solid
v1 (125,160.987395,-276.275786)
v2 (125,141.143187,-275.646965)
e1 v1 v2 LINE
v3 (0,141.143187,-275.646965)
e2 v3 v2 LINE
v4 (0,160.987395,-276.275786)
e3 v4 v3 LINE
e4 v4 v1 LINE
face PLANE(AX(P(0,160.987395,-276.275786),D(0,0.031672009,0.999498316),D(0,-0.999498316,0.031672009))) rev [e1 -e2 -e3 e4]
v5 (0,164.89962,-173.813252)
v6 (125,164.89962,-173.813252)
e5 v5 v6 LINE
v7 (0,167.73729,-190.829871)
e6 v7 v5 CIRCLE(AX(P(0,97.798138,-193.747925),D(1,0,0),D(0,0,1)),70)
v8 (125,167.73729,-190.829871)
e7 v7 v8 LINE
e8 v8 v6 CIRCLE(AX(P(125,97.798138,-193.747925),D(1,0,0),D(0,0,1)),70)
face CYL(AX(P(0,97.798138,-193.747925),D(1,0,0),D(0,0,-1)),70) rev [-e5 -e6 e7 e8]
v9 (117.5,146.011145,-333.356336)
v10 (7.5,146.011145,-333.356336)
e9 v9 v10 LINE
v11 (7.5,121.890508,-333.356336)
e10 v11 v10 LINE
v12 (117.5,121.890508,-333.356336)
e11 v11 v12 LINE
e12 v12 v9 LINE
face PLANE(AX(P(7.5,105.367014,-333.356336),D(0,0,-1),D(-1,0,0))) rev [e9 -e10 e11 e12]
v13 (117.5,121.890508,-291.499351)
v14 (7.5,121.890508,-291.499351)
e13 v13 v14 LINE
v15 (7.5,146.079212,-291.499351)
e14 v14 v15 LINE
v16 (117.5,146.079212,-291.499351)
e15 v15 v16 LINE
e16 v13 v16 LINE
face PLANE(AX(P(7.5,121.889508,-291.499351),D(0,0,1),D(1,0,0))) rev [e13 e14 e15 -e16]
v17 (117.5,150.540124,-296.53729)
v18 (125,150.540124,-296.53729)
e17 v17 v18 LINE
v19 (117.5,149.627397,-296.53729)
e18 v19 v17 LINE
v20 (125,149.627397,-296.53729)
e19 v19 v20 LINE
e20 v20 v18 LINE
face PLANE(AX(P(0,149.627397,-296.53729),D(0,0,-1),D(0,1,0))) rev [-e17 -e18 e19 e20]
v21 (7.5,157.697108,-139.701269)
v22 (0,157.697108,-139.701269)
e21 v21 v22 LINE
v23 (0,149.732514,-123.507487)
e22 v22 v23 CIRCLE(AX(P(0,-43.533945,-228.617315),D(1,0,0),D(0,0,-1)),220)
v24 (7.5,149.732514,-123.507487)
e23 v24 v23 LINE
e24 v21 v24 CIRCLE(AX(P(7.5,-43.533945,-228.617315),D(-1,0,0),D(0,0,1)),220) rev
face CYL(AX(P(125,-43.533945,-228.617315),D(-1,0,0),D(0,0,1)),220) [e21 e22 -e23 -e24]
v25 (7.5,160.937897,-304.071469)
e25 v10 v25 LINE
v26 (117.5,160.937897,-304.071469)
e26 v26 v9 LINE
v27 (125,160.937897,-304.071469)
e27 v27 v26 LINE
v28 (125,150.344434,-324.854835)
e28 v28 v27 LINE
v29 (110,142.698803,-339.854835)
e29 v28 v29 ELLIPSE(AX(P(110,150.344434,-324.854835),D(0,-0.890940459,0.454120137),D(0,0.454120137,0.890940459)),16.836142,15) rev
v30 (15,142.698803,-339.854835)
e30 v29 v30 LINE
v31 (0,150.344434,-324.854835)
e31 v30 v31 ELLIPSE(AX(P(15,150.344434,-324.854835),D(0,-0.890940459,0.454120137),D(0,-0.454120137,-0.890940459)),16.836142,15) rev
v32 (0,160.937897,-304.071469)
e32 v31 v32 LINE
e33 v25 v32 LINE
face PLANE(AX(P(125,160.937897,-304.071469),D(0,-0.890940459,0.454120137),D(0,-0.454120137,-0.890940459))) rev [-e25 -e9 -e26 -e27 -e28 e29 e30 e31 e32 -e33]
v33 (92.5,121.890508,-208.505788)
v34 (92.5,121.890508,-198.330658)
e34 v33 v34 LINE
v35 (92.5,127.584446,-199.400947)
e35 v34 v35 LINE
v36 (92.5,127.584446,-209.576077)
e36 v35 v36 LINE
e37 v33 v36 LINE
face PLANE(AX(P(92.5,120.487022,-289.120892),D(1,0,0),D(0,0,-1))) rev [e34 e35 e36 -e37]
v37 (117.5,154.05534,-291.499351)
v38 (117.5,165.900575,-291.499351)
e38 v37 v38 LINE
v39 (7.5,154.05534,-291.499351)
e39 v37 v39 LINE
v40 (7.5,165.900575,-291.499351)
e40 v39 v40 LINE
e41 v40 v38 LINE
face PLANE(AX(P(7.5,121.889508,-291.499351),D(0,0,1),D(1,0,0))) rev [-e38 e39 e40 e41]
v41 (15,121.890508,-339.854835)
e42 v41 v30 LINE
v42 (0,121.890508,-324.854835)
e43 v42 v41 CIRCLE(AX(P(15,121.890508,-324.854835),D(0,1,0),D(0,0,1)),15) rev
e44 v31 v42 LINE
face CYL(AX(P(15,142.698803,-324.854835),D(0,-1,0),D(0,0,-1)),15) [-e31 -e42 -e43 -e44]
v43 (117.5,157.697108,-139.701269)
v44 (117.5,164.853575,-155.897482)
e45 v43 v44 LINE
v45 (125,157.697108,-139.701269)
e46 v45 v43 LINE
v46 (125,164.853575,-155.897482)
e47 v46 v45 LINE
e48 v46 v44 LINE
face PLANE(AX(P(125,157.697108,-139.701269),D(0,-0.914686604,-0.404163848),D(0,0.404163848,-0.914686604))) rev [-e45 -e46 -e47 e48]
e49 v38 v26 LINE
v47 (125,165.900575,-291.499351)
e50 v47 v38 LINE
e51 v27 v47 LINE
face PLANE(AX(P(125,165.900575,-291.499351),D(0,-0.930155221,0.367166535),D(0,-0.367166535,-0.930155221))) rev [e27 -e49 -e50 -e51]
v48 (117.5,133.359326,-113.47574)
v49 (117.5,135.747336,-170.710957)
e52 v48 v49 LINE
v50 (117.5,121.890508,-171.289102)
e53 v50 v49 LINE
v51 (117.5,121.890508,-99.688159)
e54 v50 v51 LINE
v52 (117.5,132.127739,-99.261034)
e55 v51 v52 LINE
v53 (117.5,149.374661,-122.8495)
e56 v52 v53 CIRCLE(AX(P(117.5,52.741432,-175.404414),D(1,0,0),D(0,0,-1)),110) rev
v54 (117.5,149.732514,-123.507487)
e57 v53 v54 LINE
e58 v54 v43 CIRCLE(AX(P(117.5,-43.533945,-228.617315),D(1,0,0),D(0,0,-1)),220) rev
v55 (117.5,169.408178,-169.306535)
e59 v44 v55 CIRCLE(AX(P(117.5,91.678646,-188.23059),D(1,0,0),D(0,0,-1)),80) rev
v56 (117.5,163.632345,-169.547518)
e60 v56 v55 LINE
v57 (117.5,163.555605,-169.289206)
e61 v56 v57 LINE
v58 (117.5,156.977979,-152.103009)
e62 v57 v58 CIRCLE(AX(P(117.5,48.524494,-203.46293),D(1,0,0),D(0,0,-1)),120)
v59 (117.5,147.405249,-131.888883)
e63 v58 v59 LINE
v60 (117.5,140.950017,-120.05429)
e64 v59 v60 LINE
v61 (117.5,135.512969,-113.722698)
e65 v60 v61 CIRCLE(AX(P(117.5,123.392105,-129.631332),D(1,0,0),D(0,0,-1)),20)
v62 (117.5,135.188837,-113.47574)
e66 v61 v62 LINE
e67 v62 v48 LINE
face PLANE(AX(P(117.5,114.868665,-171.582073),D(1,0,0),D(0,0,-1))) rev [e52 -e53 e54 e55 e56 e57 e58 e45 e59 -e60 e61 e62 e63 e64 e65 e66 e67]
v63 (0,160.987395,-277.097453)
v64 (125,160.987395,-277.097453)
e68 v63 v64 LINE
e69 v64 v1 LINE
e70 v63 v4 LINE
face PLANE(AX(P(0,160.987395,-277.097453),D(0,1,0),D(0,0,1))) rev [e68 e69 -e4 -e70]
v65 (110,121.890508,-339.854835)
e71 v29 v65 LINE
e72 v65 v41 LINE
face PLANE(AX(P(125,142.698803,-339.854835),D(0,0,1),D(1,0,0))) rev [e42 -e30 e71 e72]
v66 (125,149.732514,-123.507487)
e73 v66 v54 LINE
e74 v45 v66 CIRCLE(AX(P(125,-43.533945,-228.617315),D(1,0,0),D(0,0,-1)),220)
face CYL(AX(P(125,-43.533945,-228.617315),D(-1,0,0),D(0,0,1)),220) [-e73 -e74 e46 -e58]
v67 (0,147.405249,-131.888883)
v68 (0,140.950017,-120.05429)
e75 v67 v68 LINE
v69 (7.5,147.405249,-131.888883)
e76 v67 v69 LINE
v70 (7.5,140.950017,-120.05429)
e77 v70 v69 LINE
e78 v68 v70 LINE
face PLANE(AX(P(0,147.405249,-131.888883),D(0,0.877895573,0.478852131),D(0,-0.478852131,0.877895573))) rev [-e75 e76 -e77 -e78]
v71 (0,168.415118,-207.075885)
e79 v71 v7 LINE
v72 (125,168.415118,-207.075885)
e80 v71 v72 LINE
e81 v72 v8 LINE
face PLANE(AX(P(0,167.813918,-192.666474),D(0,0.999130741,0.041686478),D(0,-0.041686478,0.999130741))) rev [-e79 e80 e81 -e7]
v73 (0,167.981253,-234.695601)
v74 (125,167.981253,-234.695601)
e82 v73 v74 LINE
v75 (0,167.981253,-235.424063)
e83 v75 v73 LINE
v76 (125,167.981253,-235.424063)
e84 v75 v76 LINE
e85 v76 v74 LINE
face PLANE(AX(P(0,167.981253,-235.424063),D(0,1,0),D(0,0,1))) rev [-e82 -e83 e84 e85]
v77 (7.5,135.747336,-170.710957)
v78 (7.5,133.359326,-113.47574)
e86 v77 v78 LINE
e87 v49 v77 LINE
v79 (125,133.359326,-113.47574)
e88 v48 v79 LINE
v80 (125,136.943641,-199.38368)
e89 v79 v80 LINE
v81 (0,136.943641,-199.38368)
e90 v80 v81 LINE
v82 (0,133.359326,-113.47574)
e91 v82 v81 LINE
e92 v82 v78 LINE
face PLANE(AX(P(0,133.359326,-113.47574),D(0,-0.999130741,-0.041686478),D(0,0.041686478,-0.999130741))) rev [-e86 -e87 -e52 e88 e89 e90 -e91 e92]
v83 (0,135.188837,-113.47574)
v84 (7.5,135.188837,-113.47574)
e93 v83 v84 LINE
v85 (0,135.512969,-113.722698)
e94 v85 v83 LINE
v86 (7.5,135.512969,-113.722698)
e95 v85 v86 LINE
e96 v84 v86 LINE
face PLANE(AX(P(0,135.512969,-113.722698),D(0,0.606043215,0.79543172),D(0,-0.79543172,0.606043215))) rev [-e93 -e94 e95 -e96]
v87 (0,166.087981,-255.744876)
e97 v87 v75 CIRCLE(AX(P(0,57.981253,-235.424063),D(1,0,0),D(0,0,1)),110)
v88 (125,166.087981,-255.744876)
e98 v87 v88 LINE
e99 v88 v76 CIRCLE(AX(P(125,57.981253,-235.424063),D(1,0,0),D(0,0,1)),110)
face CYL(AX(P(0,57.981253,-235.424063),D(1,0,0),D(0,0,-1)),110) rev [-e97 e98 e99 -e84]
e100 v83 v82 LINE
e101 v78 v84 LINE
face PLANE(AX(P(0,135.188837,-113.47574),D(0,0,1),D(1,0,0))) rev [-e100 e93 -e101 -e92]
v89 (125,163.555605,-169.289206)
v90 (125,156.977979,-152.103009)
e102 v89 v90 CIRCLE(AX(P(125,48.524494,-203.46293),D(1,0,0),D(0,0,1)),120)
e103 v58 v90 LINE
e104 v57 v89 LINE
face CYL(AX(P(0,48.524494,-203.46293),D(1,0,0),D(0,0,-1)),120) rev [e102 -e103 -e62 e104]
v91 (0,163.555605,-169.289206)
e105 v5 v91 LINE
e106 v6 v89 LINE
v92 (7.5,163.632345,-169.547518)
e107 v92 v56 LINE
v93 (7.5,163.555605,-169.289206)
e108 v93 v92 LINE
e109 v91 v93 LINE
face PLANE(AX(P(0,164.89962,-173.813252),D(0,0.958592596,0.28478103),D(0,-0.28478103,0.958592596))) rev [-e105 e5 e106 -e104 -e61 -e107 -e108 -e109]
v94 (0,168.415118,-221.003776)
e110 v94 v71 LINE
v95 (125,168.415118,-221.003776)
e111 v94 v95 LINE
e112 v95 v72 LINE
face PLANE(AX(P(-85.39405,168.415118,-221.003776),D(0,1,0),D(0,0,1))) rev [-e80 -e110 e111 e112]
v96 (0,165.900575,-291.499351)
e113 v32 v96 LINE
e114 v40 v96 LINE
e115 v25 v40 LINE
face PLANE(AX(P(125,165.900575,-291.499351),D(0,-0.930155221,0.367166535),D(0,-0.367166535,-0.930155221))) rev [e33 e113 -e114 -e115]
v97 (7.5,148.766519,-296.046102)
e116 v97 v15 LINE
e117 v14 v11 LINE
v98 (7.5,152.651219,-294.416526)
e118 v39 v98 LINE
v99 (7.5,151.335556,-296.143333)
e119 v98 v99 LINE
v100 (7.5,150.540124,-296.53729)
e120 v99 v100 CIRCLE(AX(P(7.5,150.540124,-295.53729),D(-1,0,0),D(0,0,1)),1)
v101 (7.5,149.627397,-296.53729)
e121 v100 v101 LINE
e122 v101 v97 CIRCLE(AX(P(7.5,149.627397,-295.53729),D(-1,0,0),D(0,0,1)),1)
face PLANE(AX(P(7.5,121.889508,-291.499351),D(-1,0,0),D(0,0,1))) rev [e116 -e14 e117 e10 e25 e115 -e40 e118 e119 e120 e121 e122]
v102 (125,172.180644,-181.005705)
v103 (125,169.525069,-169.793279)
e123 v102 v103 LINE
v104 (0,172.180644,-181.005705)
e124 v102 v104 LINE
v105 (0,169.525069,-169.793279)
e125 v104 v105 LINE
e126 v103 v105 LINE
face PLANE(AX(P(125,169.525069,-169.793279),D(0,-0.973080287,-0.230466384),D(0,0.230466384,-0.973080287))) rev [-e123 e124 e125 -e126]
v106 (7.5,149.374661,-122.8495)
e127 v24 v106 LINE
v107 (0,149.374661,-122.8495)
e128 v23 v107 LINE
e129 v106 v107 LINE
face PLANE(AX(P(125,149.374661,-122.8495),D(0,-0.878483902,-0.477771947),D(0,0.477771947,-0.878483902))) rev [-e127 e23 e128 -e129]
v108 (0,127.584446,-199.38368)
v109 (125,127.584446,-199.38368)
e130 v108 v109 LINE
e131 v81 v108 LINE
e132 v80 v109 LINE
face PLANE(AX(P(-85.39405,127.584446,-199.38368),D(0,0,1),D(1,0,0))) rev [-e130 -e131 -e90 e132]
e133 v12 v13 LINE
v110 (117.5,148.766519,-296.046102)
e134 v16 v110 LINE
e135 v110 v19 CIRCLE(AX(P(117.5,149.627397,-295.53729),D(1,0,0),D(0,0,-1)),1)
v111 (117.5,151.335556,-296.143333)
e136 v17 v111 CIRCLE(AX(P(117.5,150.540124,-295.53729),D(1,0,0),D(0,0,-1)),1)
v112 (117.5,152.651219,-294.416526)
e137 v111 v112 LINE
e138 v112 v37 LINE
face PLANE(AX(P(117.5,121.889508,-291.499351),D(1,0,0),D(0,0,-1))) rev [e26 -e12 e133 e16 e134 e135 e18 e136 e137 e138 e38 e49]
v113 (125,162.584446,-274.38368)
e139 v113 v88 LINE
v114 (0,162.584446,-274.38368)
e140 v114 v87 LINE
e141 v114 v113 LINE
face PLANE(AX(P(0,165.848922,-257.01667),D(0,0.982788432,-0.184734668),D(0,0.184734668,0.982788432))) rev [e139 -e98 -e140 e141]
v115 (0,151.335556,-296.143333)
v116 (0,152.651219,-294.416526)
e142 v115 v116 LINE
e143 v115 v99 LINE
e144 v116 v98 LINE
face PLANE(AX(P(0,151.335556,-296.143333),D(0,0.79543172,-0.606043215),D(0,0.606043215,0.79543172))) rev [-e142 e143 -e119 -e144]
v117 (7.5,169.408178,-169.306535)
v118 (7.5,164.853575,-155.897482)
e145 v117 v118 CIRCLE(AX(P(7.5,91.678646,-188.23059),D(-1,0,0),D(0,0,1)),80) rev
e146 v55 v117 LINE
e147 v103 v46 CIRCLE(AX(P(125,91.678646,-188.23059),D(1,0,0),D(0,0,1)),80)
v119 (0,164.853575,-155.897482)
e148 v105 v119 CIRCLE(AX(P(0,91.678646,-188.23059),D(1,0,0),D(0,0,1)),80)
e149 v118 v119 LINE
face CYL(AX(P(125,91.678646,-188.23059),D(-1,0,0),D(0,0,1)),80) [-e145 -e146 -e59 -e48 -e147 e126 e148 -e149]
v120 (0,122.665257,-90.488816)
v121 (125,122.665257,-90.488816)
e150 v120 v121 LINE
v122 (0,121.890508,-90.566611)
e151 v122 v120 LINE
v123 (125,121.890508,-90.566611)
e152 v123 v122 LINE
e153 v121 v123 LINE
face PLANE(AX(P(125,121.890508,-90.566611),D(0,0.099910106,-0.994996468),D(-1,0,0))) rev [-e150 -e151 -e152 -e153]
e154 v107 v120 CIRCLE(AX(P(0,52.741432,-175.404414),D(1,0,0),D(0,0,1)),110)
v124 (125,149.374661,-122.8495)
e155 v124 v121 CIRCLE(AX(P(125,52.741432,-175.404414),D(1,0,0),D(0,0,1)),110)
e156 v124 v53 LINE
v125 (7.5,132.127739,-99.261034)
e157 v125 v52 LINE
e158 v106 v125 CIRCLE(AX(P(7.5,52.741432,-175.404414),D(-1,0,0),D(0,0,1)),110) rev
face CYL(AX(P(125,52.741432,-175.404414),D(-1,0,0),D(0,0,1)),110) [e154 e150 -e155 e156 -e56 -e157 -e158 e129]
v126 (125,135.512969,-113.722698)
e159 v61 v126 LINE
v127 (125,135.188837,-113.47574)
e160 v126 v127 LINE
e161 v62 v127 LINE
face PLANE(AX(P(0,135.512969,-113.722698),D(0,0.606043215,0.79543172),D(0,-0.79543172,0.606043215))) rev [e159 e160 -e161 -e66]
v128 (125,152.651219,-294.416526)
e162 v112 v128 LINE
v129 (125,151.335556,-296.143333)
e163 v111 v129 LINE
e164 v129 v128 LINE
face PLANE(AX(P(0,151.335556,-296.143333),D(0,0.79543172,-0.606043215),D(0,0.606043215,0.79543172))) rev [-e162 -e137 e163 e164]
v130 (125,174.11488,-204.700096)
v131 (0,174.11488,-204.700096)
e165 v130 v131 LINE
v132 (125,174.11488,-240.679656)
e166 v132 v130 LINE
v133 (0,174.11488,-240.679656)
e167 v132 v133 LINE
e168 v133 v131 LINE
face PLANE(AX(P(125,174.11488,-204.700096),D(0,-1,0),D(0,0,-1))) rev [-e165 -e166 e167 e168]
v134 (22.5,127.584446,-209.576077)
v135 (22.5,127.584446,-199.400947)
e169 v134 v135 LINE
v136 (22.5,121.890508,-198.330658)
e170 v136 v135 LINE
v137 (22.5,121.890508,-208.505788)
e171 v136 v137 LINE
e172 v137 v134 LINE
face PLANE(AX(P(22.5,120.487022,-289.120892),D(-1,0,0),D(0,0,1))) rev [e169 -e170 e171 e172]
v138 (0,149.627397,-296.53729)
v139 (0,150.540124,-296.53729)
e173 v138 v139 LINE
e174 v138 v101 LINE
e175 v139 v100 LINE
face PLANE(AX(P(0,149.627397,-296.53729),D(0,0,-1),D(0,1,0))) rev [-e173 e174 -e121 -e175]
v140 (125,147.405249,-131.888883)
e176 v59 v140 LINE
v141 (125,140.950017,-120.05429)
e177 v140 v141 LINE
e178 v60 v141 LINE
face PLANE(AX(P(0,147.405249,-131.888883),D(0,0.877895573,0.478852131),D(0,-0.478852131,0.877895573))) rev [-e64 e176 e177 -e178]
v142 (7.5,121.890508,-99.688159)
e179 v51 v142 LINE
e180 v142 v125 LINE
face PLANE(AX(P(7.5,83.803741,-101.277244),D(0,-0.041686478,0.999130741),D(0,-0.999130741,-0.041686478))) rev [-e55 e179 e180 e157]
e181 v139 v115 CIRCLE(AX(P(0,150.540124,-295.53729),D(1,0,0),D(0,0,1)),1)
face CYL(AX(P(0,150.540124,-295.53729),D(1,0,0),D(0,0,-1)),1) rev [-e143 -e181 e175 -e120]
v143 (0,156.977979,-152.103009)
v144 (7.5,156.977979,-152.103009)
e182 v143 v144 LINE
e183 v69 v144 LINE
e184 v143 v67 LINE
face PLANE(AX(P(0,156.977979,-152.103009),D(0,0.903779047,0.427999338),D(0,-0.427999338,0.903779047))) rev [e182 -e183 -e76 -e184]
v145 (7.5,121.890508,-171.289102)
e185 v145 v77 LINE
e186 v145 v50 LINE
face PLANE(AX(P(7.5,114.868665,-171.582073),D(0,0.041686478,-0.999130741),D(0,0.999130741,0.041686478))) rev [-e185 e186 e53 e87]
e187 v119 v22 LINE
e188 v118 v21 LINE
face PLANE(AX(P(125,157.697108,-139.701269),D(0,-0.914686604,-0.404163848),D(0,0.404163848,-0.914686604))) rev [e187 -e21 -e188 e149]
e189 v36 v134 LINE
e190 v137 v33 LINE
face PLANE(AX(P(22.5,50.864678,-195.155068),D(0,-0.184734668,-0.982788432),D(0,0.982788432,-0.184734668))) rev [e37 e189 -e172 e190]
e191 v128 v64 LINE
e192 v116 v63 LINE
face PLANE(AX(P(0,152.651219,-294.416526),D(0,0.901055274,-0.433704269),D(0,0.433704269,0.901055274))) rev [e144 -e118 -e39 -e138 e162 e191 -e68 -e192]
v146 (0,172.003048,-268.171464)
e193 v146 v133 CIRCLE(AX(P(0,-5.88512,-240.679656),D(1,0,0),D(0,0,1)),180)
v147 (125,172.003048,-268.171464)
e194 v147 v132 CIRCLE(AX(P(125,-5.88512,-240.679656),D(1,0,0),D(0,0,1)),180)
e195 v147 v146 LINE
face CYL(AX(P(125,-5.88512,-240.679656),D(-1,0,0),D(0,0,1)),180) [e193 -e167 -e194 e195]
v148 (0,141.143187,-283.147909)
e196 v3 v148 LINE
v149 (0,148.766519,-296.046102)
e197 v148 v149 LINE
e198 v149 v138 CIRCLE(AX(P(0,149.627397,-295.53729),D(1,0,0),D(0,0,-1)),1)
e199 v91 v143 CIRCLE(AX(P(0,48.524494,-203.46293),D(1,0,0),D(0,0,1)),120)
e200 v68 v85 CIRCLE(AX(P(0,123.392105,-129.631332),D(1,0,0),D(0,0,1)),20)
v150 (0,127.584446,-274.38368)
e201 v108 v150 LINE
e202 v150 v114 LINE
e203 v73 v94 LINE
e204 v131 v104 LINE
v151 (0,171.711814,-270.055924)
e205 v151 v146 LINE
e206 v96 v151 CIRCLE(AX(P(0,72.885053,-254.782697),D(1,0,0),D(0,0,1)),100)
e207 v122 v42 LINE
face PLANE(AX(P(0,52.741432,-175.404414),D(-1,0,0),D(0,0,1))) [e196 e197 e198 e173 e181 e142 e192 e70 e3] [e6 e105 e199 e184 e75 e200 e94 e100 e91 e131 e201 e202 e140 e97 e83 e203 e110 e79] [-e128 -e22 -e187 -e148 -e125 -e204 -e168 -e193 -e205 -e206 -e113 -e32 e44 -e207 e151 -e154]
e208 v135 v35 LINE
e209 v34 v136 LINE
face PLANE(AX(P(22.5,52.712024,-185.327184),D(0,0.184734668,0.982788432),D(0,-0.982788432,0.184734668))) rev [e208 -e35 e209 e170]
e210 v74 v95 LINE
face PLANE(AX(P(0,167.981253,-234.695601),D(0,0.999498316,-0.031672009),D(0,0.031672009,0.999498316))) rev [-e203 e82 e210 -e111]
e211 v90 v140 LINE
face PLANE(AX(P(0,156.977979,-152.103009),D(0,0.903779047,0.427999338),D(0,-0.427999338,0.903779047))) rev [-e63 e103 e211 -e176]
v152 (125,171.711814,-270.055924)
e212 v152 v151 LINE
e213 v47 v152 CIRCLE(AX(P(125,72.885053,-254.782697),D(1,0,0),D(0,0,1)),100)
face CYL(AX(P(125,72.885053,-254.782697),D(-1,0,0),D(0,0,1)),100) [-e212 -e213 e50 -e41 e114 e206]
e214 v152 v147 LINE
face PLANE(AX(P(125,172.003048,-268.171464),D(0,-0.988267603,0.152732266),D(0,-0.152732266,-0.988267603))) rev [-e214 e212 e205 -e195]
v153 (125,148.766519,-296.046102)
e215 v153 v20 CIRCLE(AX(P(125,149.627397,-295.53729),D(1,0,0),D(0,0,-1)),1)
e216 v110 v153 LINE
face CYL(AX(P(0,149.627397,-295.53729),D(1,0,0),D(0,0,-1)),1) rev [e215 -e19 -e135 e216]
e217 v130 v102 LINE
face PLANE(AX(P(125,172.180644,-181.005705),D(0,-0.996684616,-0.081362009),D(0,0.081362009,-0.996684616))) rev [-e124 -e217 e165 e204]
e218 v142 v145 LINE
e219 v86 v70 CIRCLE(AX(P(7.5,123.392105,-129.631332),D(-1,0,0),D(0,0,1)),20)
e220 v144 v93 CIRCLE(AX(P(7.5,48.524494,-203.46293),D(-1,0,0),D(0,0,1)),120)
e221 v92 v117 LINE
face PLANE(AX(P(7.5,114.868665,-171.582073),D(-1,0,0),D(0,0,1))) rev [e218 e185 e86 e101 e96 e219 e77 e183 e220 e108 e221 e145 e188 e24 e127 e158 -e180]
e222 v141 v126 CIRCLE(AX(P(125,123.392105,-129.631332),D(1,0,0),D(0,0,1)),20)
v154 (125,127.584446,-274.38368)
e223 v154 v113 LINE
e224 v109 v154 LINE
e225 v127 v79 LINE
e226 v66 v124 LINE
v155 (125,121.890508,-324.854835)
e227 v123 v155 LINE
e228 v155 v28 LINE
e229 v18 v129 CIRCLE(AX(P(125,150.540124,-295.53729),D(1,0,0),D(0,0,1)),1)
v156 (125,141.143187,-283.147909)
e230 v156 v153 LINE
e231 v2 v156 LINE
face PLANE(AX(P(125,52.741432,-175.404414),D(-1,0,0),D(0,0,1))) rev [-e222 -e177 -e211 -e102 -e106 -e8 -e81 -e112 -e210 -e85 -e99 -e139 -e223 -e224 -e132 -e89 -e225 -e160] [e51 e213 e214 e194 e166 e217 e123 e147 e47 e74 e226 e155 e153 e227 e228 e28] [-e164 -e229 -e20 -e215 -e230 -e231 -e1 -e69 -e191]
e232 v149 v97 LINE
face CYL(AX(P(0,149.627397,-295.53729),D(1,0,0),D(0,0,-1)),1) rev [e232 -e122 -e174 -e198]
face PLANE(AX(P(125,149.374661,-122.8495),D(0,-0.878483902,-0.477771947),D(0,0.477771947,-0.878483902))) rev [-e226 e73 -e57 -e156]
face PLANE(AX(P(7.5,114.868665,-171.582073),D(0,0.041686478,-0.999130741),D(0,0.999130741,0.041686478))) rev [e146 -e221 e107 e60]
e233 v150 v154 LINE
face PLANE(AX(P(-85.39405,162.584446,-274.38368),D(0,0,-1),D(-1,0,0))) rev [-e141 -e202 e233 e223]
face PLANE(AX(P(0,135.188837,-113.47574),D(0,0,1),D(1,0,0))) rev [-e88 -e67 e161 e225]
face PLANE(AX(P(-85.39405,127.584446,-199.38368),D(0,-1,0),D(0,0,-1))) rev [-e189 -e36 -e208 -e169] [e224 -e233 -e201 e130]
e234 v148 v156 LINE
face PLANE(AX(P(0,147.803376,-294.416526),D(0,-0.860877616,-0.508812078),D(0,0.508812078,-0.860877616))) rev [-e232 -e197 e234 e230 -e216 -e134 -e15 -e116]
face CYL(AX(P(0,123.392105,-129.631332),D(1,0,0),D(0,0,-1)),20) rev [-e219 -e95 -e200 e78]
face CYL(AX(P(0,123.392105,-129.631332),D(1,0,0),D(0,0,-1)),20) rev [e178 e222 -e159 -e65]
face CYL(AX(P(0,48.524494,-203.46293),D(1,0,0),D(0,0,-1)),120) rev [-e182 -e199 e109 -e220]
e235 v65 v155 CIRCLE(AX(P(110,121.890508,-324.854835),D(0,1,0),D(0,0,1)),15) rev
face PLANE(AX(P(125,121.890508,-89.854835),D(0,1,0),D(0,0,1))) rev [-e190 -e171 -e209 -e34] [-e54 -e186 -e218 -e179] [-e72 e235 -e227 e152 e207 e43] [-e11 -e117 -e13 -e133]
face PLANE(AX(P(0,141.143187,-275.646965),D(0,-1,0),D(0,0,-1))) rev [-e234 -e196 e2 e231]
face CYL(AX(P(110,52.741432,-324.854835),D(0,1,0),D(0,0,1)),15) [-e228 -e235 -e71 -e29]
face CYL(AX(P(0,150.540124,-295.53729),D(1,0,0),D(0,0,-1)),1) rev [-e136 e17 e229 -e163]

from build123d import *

# Parameters (mm, degrees)
BOSS_EXTRUDE1_DEPTH = 125
CUT_EXTRUDE1_DEPTH  = 402.798830122
CUT_EXTRUDE2_START  = 7.5
CUT_EXTRUDE2_DEPTH  = 110
CUT_EXTRUDE3_START  = 7.5
CUT_EXTRUDE3_DEPTH  = 110
CUT_EXTRUDE4_REACH  = 265.278
SKETCH6_W           = 70.076051312
SKETCH6_H           = 19.92290321
CUT_EXTRUDE5_REACH  = 297.109
SKETCH5_W           = 70
SKETCH5_H           = 20.313376992
CUT_EXTRUDE6_REACH  = 337.806
SKETCH7_W           = 70
SKETCH7_H           = 10
FILLET1_R           = 15
CUT_EXTRUDE7_START  = -125
CUT_EXTRUDE7_DEPTH  = 125
CHAMFER1_START      = 101
CHAMFER1_OUTLINE_W  = 127
CHAMFER1_OUTLINE_H  = 4
CHAMFER1_DEPTH      = 1.291551205


with BuildPart() as part:
    # Sketch1 → Boss-Extrude1 (new body)
    with BuildSketch(Plane(origin=(0, 0, 0), x_dir=(0, 0, -1), z_dir=(1, 0, 0))):
        with BuildLine():
            Line((89.8548345, 121.890508387), (339.8548345, 121.890508387))
            Line((339.8548345, 121.890508387), (339.8548345, 142.698803067))
            Line((339.8548345, 142.698803067), (328.974757131, 148.244473571))
            Line((328.974757131, 148.244473571), (304.07146893, 160.937897169))
            Line((304.07146893, 160.937897169), (291.499350701, 165.900575417))
            ThreePointArc((291.499350701, 165.900575417), (280.939522904, 169.403551358), (270.055923817, 171.711813574))
            Line((270.055923817, 171.711813574), (268.171463935, 172.003048284))
            ThreePointArc((268.171463935, 172.003048284), (254.466056361, 173.586145336), (240.679656072, 174.114879761))
            Line((240.679656072, 174.114879761), (232.021178794, 174.114879761))
            Line((232.021178794, 174.114879761), (204.700095622, 174.114879761))
            Line((204.700095622, 174.114879761), (181.005704906, 172.180643784))
            Line((181.005704906, 172.180643784), (169.793278807, 169.525069181))
            ThreePointArc((169.793278807, 169.525069181), (162.738148163, 167.508293641), (155.897481651, 164.85357451))
            Line((155.897481651, 164.85357451), (139.701268702, 157.697108323))
            ThreePointArc((139.701268702, 157.697108323), (131.522677332, 153.88092637), (123.507487012, 149.732513946))
            Line((123.507487012, 149.732513946), (122.849499947, 149.374661332))
            ThreePointArc((122.849499947, 149.374661332), (105.217865801, 137.440006065), (90.215677989, 122.332230589))
            Line((90.215677989, 122.332230589), (89.8548345, 121.890508387))
        make_face()
    extrude(amount=BOSS_EXTRUDE1_DEPTH)

    # Sketch2 → Cut-Extrude1 (cut, through all)
    with BuildSketch(Plane(origin=(125, 0, 0), x_dir=(0, 0, -1), z_dir=(1, 0, 0))):
        with BuildLine():
            Line((113.475739659, 133.359325966), (201.174236889, 137.018348058))
            Line((201.174236889, 137.018348058), (207.075885424, 168.415118264))
            Line((207.075885424, 168.415118264), (192.666474105, 167.813918061))
            Line((192.666474105, 167.813918061), (190.829871081, 167.73728994))
            ThreePointArc((190.829871081, 167.73728994), (182.233808887, 166.844681368), (173.813252446, 164.899619793))
            Line((173.813252446, 164.899619793), (169.2892062, 163.555605085))
            ThreePointArc((169.2892062, 163.555605085), (160.569837528, 160.5967142), (152.103009161, 156.977979241))
            Line((152.103009161, 156.977979241), (131.888883088, 147.40524948))
            Line((131.888883088, 147.40524948), (120.054289503, 140.950016615))
            ThreePointArc((120.054289503, 140.950016615), (116.601738736, 138.565427019), (113.722697716, 135.512969462))
            Line((113.722697716, 135.512969462), (113.475739659, 135.188837012))
            Line((113.475739659, 135.188837012), (113.475739659, 133.359325966))
        make_face()
        with BuildLine():
            Line((221.003775967, 168.415118264), (218.761149524, 138.906875589))
            Line((218.761149524, 138.906875589), (272.584184163, 138.906875589))
            Line((272.584184163, 138.906875589), (274.383679522, 162.58444611))
            Line((274.383679522, 162.58444611), (267.028526617, 163.966993649))
            Line((267.028526617, 163.966993649), (257.016670223, 165.848921543))
            Line((257.016670223, 165.848921543), (255.744876296, 166.087980551))
            ThreePointArc((255.744876296, 166.087980551), (245.628472921, 167.506912168), (235.424062848, 167.981253005))
            Line((235.424062848, 167.981253005), (234.695600568, 167.981253005))
            Line((234.695600568, 167.981253005), (221.003775967, 168.415118264))
        make_face()
        with BuildLine():
            Line((276.275786009, 160.987395212), (275.646964577, 141.143186512))
            Line((275.646964577, 141.143186512), (283.14790924, 141.143186512))
            Line((283.14790924, 141.143186512), (294.416525801, 147.803376186))
            Line((294.416525801, 147.803376186), (296.046101937, 148.766518919))
            ThreePointArc((296.046101937, 148.766518919), (296.405855365, 149.13182216), (296.537289859, 149.627396535))
            Line((296.537289859, 149.627396535), (296.537289859, 150.540124257))
            ThreePointArc((296.537289859, 150.540124257), (296.433404588, 150.983946735), (296.143333074, 151.335555977))
            Line((296.143333074, 151.335555977), (294.416525801, 152.651218661))
            Line((294.416525801, 152.651218661), (277.097452917, 160.987395212))
            Line((277.097452917, 160.987395212), (276.275786009, 160.987395212))
        make_face()
    extrude(amount=-CUT_EXTRUDE1_DEPTH, mode=Mode.SUBTRACT)

    # Cut-Extrude2: read off the stored shape, not the designer's step
    # Cut-Extrude2 outline → Cut-Extrude2 (cut)
    with BuildSketch(Plane.YZ.offset(CUT_EXTRUDE2_START)):
        with BuildLine():
            Line((121.890508387, -99.688159251), (121.890508387, -171.289102204))
            Line((121.890508387, -171.289102204), (135.747336393, -170.710957294))
            Line((135.747336393, -170.710957294), (133.359325966, -113.475739659))
            Line((133.359325966, -113.475739659), (135.188837012, -113.475739659))
            Line((135.188837012, -113.475739659), (135.512969462, -113.722697716))
            ThreePointArc((135.512969462, -113.722697716), (138.565427019, -116.601738736), (140.950016615, -120.054289503))
            Line((140.950016615, -120.054289503), (147.40524948, -131.888883088))
            Line((147.40524948, -131.888883088), (156.977979241, -152.103009161))
            ThreePointArc((156.977979241, -152.103009161), (160.5967142, -160.569837528), (163.555605085, -169.2892062))
            Line((163.555605085, -169.2892062), (163.632345036, -169.547518172))
            Line((163.632345036, -169.547518172), (169.408178174, -169.306534555))
            ThreePointArc((169.408178174, -169.306534555), (167.428165725, -162.501028912), (164.85357451, -155.897481651))
            Line((164.85357451, -155.897481651), (157.697108323, -139.701268702))
            ThreePointArc((157.697108323, -139.701268702), (153.88092637, -131.522677332), (149.732513946, -123.507487012))
            Line((149.732513946, -123.507487012), (149.374661332, -122.849499947))
            ThreePointArc((149.374661332, -122.849499947), (141.537958861, -110.480020928), (132.127738515, -99.261033903))
            Line((132.127738515, -99.261033903), (121.890508387, -99.688159251))
        make_face()
    extrude(amount=CUT_EXTRUDE2_DEPTH, mode=Mode.SUBTRACT)

    # Cut-Extrude3: read off the stored shape, not the designer's step
    # Cut-Extrude3 outline → Cut-Extrude3 (cut)
    with BuildSketch(Plane.YZ.offset(CUT_EXTRUDE3_START)):
        with BuildLine():
            Line((121.890508387, -291.499350701), (121.890508387, -333.35633566))
            Line((121.890508387, -333.35633566), (146.011144709, -333.35633566))
            Line((146.011144709, -333.35633566), (160.937897169, -304.07146893))
            Line((160.937897169, -304.07146893), (165.900575417, -291.499350701))
            Line((165.900575417, -291.499350701), (154.055340396, -291.499350701))
            Line((154.055340396, -291.499350701), (152.651218661, -294.416525801))
            Line((152.651218661, -294.416525801), (151.335555977, -296.143333074))
            ThreePointArc((151.335555977, -296.143333074), (150.983946735, -296.433404588), (150.540124257, -296.537289859))
            Line((150.540124257, -296.537289859), (149.627396535, -296.537289859))
            ThreePointArc((149.627396535, -296.537289859), (149.13182216, -296.405855365), (148.766518919, -296.046101937))
            Line((148.766518919, -296.046101937), (146.079212499, -291.499350701))
            Line((146.079212499, -291.499350701), (121.890508387, -291.499350701))
        make_face()
    extrude(amount=CUT_EXTRUDE3_DEPTH, mode=Mode.SUBTRACT)

    # Cut-Extrude4: up to this plane
    cut_extrude4_end = Plane(origin=(0, 137.018348058, -201.174236889), z_dir=(0, -0.18473466771426061, -0.9827884322398701))
    # Sketch6 → Cut-Extrude4 (cut, up to the surface)
    with BuildSketch(Plane(origin=(0, -15.732649467, -207.008545619), x_dir=(-1, 0, 0), z_dir=(0, -0.07578145826840303, -0.9971244509000441)), mode=Mode.PRIVATE) as cut_extrude4_sk1:
        with Locations((-57.714978641, 162.925898332)):
            Rectangle(SKETCH6_W, SKETCH6_H)
    cut_extrude4_tool1 = split(extrude(cut_extrude4_sk1.sketch, amount=-CUT_EXTRUDE4_REACH, mode=Mode.PRIVATE), bisect_by=cut_extrude4_end, keep=Keep.BOTH, mode=Mode.PRIVATE)
    add(cut_extrude4_tool1.solids().sort_by_distance((57.714979, 146.724747, -219.355308))[0], mode=Mode.SUBTRACT)

    # Cut-Extrude5: up to this plane
    cut_extrude5_end = Plane(origin=(0, 168.415118264, -221.003775967), z_dir=(0, 0.075781458268403, 0.997124450900044))
    # Sketch5 → Cut-Extrude5 (cut, up to the surface)
    with BuildSketch(Plane(origin=(0, -31.848196468, -169.432405211), x_dir=(1, 0, 0), z_dir=(0, 0.18473466771426064, 0.9827884322398701)), mode=Mode.PRIVATE) as cut_extrude5_sk1:
        with Locations((57.5, 181.980591777)):
            Rectangle(SKETCH5_W, SKETCH5_H)
    cut_extrude5_tool1 = split(extrude(cut_extrude5_sk1.sketch, amount=-CUT_EXTRUDE5_REACH, mode=Mode.PRIVATE), bisect_by=cut_extrude5_end, keep=Keep.BOTH, mode=Mode.PRIVATE)
    add(cut_extrude5_tool1.solids().sort_by_distance((57.5, 147.000224, -203.050529))[0], mode=Mode.SUBTRACT)

    # Cut-Extrude6: up to this plane
    cut_extrude6_end = Plane(origin=(125, 121.890508387, -89.8548345), z_dir=(0, 1, 0))
    # Sketch7 → Cut-Extrude6 (cut, up to the surface)
    with BuildSketch(Plane(origin=(0, 168.866544526, -31.741831678), x_dir=(1, 0, 0), z_dir=(0, 0.9827884322398701, -0.18473466771426067)), mode=Mode.PRIVATE) as cut_extrude6_sk1:
        with Locations((57.5, 177.39967388)):
            Rectangle(SKETCH7_W, SKETCH7_H)
    cut_extrude6_tool1 = split(extrude(cut_extrude6_sk1.sketch, amount=-CUT_EXTRUDE6_REACH, mode=Mode.PRIVATE), bisect_by=cut_extrude6_end, keep=Keep.BOTH, mode=Mode.PRIVATE)
    add(cut_extrude6_tool1.solids().sort_by_distance((57.5, 136.094675, -206.088179))[0], mode=Mode.SUBTRACT)

    # Fillet1
    fillet1_edges = [part.edges().sort_by_distance(p)[0] for p in [
        (125, 132.294655727, -339.8548345),
        (0, 132.294655727, -339.8548345),
    ]]
    fillet(fillet1_edges, radius=FILLET1_R)

    # Sketch14 → Cut-Extrude7 (cut)
    with BuildSketch(Plane(origin=(125, 0, 0), x_dir=(0, 0, -1), z_dir=(1, 0, 0)).offset(CUT_EXTRUDE7_START)):
        Polygon((221.003775967, 168.415118264), (207.075885424, 168.415118264), (199.383679522, 168.094178314), (199.383679522, 127.58444611), (274.383679522, 127.58444611), (274.383679522, 162.58444611), (255.744876296, 166.087980551), (245.628472921, 167.506912168), (235.059831708, 167.981253005), (234.695600568, 167.981253005), align=None)
    extrude(amount=CUT_EXTRUDE7_DEPTH, mode=Mode.SUBTRACT)

    # Chamfer1: read off the stored shape, not the designer's step
    # Chamfer1 outline → Chamfer1 (cut)
    with BuildSketch(Plane(origin=(0, 0, 0), x_dir=(1, 0, 0), z_dir=(0, 0.09991010561593, -0.99499646773032)).offset(CHAMFER1_START)):
        with Locations((62.5, -113)):
            Rectangle(CHAMFER1_OUTLINE_W, CHAMFER1_OUTLINE_H)
    extrude(amount=CHAMFER1_DEPTH, mode=Mode.SUBTRACT)


solid = part.part
